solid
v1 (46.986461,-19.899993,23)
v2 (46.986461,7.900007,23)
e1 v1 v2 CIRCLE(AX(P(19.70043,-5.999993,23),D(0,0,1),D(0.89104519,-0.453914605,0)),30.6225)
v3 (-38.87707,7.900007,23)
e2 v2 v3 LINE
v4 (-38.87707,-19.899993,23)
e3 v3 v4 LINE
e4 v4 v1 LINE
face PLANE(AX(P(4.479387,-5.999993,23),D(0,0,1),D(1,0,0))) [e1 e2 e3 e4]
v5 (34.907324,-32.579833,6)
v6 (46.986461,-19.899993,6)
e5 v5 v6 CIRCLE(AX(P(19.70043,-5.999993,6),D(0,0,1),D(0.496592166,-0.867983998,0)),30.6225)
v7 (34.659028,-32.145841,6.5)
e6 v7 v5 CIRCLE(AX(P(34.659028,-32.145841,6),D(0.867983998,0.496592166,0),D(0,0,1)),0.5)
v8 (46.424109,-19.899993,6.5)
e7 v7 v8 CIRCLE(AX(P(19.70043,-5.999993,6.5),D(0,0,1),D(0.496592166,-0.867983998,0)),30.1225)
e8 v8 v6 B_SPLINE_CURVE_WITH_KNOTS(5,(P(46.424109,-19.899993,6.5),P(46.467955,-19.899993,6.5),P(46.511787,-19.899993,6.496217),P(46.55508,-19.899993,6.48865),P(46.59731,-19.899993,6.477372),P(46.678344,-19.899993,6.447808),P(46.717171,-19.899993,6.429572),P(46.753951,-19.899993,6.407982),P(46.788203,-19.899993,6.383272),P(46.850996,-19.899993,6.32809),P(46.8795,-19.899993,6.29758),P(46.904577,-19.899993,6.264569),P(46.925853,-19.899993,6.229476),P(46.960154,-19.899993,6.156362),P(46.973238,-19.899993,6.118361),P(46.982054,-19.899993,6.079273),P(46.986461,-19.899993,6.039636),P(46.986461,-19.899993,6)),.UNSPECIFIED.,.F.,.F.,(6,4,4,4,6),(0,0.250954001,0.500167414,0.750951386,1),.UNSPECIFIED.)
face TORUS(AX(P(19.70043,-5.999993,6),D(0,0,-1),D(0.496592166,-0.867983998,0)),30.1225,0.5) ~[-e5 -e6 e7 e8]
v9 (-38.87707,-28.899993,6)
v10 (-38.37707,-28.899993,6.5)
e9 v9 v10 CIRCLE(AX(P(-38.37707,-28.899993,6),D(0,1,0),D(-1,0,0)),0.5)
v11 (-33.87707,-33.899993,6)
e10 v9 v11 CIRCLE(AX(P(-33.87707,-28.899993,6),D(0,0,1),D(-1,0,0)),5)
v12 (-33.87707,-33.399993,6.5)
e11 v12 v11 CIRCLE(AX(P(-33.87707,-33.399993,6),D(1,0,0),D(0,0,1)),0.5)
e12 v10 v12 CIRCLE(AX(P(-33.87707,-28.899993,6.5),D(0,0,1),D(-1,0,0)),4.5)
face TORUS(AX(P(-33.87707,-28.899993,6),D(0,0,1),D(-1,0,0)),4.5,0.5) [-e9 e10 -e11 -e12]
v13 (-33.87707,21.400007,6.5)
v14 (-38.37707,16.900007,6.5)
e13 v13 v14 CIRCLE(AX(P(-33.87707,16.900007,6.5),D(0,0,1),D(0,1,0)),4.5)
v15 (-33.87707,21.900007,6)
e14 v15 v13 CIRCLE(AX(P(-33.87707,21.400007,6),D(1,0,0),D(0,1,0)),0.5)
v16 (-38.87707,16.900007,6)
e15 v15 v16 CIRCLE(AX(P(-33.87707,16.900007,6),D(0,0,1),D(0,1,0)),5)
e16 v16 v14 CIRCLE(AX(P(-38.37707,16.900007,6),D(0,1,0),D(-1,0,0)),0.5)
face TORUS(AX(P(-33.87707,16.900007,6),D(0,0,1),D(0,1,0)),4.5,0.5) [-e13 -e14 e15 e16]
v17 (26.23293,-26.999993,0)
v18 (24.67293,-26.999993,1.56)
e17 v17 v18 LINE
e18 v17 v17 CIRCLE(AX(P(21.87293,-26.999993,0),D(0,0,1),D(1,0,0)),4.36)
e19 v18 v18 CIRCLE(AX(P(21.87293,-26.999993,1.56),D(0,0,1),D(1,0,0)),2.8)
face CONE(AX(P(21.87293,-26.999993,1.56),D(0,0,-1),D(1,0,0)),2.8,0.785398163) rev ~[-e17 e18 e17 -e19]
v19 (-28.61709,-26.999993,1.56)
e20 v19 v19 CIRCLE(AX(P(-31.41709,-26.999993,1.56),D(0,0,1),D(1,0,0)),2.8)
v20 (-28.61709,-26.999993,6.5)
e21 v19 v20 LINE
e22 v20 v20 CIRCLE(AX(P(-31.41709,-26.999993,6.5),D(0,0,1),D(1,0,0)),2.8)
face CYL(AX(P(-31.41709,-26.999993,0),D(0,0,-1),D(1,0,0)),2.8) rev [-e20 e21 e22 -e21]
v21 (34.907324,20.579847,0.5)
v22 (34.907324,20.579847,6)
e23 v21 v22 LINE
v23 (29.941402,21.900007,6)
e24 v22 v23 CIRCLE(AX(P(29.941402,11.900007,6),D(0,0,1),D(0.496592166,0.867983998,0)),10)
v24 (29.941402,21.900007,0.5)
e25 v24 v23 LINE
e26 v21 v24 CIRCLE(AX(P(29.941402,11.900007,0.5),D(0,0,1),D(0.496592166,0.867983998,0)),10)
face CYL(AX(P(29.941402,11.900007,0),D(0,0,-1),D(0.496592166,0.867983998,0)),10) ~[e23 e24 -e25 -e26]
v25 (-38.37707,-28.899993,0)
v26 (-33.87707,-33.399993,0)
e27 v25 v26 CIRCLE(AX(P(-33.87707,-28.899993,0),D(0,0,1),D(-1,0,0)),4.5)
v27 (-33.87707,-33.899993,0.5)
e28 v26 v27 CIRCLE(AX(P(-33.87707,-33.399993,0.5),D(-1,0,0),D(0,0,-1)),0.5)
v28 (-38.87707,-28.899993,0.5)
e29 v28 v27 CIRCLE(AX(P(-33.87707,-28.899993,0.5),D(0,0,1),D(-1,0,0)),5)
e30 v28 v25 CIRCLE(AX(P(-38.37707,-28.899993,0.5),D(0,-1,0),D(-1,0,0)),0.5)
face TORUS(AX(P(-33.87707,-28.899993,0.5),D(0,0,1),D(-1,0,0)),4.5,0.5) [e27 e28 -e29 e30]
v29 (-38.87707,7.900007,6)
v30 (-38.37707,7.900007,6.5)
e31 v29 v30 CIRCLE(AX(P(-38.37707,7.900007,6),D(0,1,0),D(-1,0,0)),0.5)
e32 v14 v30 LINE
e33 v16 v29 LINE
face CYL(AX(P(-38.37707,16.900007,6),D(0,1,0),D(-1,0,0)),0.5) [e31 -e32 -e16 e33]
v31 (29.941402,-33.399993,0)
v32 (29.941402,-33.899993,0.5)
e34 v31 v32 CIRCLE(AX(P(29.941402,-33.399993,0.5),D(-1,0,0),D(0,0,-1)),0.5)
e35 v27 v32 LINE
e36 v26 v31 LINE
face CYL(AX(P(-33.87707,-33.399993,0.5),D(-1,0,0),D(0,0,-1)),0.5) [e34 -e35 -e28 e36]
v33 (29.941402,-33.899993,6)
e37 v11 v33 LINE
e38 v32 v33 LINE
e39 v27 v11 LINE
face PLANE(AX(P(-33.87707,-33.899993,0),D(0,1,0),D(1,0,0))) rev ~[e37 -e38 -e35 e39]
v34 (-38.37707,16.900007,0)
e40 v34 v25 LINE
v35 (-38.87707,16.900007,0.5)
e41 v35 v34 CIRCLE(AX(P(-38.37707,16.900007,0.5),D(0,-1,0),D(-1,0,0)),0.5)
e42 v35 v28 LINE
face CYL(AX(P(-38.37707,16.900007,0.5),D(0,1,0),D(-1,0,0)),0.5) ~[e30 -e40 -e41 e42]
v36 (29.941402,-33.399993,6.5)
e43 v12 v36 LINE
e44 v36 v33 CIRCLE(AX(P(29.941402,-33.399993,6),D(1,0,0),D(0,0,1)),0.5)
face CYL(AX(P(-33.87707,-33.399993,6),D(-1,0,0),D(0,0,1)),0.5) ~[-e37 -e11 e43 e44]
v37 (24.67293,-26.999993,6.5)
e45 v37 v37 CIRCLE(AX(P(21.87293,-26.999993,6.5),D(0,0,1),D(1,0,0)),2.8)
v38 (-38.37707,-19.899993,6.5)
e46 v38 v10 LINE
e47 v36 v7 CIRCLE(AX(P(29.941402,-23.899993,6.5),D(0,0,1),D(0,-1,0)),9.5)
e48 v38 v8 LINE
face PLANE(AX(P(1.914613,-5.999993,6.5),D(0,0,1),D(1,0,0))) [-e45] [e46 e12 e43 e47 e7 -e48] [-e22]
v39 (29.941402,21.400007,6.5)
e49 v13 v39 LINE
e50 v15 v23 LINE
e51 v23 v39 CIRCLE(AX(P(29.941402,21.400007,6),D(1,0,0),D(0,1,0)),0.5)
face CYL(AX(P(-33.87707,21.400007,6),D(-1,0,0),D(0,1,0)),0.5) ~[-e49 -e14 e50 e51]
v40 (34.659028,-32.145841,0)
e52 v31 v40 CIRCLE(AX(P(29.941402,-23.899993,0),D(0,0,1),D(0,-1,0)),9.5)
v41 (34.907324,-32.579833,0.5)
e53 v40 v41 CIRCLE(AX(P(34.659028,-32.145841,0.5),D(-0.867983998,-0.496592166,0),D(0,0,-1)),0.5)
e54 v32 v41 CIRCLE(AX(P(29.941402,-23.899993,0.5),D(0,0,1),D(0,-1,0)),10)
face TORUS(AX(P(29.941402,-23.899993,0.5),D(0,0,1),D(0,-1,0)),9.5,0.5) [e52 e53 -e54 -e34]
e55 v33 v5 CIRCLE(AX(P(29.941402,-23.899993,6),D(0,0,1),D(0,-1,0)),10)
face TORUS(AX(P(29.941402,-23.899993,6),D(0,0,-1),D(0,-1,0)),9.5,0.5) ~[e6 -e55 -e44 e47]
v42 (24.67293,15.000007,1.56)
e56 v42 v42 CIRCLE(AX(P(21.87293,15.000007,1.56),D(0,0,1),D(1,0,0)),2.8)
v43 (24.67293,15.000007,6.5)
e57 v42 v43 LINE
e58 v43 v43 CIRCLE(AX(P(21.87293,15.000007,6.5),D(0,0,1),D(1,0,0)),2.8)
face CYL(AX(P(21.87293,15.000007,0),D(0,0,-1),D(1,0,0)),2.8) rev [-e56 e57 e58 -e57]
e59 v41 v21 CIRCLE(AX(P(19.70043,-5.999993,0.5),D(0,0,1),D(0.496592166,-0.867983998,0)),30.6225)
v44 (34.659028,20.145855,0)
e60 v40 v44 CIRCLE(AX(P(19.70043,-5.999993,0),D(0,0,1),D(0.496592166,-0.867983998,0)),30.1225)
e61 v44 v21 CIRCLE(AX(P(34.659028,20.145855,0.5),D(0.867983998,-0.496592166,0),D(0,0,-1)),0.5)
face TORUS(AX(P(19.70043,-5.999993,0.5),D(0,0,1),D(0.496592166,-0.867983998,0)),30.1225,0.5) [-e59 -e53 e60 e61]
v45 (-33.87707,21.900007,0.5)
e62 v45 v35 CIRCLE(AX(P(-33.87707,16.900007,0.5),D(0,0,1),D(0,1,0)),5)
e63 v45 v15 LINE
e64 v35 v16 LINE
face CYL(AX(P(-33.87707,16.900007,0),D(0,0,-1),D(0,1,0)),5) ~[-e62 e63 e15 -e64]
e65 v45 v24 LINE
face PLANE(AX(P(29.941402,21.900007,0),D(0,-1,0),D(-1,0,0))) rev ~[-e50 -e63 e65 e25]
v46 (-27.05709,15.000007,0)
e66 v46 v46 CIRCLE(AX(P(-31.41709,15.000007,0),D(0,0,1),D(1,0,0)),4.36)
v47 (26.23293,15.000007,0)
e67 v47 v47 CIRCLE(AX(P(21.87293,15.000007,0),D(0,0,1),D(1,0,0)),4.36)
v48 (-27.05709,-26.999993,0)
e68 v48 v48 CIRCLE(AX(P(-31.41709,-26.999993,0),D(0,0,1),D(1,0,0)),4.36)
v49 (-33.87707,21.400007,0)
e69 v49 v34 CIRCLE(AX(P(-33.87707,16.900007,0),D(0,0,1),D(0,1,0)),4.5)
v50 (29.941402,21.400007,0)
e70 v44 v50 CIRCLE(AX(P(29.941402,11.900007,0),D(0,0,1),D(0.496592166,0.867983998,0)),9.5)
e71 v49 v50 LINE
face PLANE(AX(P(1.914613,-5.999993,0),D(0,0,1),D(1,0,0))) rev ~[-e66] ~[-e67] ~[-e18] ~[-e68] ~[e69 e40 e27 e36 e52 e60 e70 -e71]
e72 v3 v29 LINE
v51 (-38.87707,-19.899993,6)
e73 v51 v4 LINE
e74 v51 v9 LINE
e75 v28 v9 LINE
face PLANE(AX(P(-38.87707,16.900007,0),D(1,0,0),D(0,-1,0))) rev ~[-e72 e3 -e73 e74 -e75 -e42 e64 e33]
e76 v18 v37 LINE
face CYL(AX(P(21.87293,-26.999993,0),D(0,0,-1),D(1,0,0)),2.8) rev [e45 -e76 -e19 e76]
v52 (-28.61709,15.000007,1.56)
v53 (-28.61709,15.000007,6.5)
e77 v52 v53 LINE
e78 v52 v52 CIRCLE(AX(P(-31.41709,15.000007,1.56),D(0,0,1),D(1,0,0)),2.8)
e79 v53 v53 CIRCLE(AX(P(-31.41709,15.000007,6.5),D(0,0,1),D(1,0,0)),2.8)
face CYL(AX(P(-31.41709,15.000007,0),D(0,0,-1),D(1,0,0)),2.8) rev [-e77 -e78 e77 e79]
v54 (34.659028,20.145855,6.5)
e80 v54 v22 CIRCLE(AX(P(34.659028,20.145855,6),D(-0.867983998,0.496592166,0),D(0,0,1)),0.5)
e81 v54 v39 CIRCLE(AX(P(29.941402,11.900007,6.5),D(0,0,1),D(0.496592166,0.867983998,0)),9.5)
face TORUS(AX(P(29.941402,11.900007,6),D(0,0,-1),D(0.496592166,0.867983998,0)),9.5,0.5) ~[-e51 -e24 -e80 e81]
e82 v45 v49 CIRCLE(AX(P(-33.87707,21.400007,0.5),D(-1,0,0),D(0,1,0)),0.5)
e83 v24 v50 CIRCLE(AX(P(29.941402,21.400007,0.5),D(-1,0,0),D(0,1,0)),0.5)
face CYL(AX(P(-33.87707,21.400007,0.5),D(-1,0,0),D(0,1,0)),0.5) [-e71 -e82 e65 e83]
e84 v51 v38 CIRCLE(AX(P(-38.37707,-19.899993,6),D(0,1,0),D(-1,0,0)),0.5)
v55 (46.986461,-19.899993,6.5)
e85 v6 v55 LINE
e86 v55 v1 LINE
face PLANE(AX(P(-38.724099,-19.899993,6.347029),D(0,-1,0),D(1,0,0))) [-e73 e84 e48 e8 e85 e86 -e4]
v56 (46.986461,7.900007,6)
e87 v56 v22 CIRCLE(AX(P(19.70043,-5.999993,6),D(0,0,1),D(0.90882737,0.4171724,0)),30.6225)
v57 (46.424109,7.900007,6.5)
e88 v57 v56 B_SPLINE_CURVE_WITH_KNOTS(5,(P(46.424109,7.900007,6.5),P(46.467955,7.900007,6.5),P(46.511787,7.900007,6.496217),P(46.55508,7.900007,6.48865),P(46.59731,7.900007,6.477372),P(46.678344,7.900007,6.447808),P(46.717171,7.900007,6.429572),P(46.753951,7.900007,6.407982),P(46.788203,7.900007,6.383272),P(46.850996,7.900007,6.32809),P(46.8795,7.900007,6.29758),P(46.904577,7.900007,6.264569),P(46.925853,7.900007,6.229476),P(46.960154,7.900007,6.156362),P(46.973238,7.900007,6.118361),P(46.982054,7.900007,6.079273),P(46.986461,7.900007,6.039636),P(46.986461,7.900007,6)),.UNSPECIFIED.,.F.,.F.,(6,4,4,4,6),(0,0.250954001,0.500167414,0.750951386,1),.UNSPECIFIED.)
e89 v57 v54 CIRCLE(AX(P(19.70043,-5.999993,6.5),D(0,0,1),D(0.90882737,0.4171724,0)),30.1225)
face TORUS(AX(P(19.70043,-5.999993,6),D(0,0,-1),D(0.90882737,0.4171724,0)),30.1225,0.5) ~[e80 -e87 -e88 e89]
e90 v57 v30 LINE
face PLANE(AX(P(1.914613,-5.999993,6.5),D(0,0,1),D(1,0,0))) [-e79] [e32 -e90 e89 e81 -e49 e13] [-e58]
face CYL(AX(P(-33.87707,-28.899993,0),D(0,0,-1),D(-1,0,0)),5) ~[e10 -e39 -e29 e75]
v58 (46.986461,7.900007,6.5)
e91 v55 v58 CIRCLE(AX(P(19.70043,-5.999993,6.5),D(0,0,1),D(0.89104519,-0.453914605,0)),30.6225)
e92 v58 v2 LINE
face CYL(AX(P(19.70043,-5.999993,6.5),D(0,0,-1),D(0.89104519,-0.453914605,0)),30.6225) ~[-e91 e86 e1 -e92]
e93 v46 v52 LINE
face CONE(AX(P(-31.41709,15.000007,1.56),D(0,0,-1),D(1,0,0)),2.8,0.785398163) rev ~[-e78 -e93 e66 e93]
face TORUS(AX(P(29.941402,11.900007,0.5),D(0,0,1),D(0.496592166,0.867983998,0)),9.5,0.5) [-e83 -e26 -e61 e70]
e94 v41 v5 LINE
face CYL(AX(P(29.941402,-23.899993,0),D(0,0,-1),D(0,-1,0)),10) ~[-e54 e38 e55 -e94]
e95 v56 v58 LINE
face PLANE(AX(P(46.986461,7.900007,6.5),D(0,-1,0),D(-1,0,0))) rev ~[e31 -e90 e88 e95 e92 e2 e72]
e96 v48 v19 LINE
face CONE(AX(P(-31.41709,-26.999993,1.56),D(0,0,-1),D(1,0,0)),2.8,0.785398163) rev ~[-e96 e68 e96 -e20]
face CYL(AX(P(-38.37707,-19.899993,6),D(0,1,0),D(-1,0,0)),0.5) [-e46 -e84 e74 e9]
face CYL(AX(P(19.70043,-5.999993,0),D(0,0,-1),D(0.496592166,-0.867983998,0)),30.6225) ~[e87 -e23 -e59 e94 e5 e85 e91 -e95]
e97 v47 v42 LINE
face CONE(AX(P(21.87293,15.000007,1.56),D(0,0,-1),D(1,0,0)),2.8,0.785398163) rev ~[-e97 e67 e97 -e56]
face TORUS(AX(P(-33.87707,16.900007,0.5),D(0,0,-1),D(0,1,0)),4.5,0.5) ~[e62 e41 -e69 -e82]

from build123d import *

# Parameters (mm, degrees)
F0_R         = 2.8
F1_DEPTH     = 6.5
F3_DEPTH     = 16.5
F4_T1_DEPTH  = 63.8184719387
F4_T3_DEPTH  = 45.8
F4_T5_DEPTH  = 9
F4_T7_DEPTH  = 9
F4_T10_ANGLE = 90
F4_T12_ANGLE = 120.4504110916
F4_T14_ANGLE = 90
F4_T16_ANGLE = 90
F4_T18_ANGLE = 29.7747944542
F4_T20_ANGLE = 29.7747944542
F4_T22_ANGLE = 29.7747944542
F4_T26_ANGLE = 35.5690080159
F4_T29_ANGLE = 90
F4_T33_ANGLE = 35.5690080159
F4_T36_ANGLE = 29.7747944542
F5_SIZE      = 1.56


# Not quite as in the source:
# - a fillet or chamfer that OpenCascade refuses, or shapes differently, is made with other operations: its cross-section is extruded or revolved along the edge and cut away or added


with BuildPart() as f1:
    # F0 (on Top) → F1 (new body)
    with BuildSketch(Plane.XY):
        with BuildLine():
            Line((-38.8770699501, 16.9000072956), (-38.8770699501, -28.8999927044))
            ThreePointArc((-38.8770699501, -28.8999927044), (-37.412603856, -32.4355266103), (-33.8770699501, -33.8999927044))
            Line((-33.8770699501, -33.8999927044), (29.9414019886, -33.8999927044))
            ThreePointArc((29.9414019886, -33.8999927044), (32.5106042183, -33.5643188528), (34.9073236464, -32.579832685))
            ThreePointArc((34.9073236464, -32.579832685), (50.3229300499, -5.9999927044), (34.9073236464, 20.5798472762))
            ThreePointArc((34.9073236464, 20.5798472762), (32.5106042183, 21.564333444), (29.9414019886, 21.9000072956))
            Line((29.9414019886, 21.9000072956), (-33.8770699501, 21.9000072956))
            ThreePointArc((-33.8770699501, 21.9000072956), (-37.412603856, 20.4355412015), (-38.8770699501, 16.9000072956))
        make_face()
        with Locations((-31.4170904458, -26.9999932498)):
            Circle(F0_R, mode=Mode.SUBTRACT)
        with Locations((21.8729300499, -26.9999927044)):
            Circle(F0_R, mode=Mode.SUBTRACT)
        with Locations((-31.4170904458, 15.0000071153)):
            Circle(F0_R, mode=Mode.SUBTRACT)
        with Locations((21.8729300499, 15.0000072956)):
            Circle(F0_R, mode=Mode.SUBTRACT)
    extrude(amount=F1_DEPTH)

    # F2 (on face) → F3 (join)
    with BuildSketch(Plane.XY.offset(6.5)):
        with BuildLine():
            Line((-38.8770699501, 7.9000072956), (-38.8770699501, -5.9999927044))
            Line((-38.8770699501, -5.9999927044), (-38.8770699501, -19.8999927044))
            Line((-38.8770699501, -19.8999927044), (46.9864613892, -19.8999927044))
            ThreePointArc((46.9864613892, -19.8999927044), (50.3229300499, -5.9999927044), (46.9864613892, 7.9000072956))
            Line((46.9864613892, 7.9000072956), (-38.8770699501, 7.9000072956))
        make_face()
    extrude(amount=F3_DEPTH)

    # F4: fillet of radius 0.5 on 18 edges, made by hand

    # F4_s2 → F4_t1 (cut)
    with BuildSketch(Plane.YZ.offset(-33.8770699501)):
        with BuildLine():
            ThreePointArc((21.9000072956, 0.5), (21.7535606862, 0.1464466094), (21.4000072956, 0))
            Line((21.4000072956, 0), (21.9000072956, 0))
            Line((21.9000072956, 0), (21.9000072956, 0.5))
        make_face()
        with BuildLine():
            ThreePointArc((21.9000072956, 6), (21.7535606862, 6.3535533906), (21.4000072956, 6.5))
            Line((21.4000072956, 6.5), (21.9000072956, 6.5))
            Line((21.9000072956, 6.5), (21.9000072956, 6))
        make_face()
        with BuildLine():
            ThreePointArc((-33.3999927044, 6.5), (-33.753546095, 6.3535533906), (-33.8999927044, 6))
            Line((-33.8999927044, 6), (-33.8999927044, 6.5))
            Line((-33.8999927044, 6.5), (-33.3999927044, 6.5))
        make_face()
        with BuildLine():
            ThreePointArc((-33.3999927044, 0), (-33.753546095, 0.1464466094), (-33.8999927044, 0.5))
            Line((-33.8999927044, 0.5), (-33.8999927044, 0))
            Line((-33.8999927044, 0), (-33.3999927044, 0))
        make_face()
    extrude(amount=F4_T1_DEPTH, mode=Mode.SUBTRACT)

    # F4_s4 → F4_t3 (cut)
    with BuildSketch(Plane.XZ.offset(-16.9000072956)):
        with BuildLine():
            ThreePointArc((-38.8770699501, 0.5), (-38.7306233407, 0.1464466094), (-38.3770699501, 0))
            Line((-38.3770699501, 0), (-38.8770699501, 0))
            Line((-38.8770699501, 0), (-38.8770699501, 0.5))
        make_face()
    extrude(amount=F4_T3_DEPTH, mode=Mode.SUBTRACT)

    # F4_s6 → F4_t5 (cut)
    with BuildSketch(Plane.XZ.offset(-16.9000072956)):
        with BuildLine():
            ThreePointArc((-38.8770699501, 6), (-38.7306233407, 6.3535533906), (-38.3770699501, 6.5))
            Line((-38.3770699501, 6.5), (-38.8770699501, 6.5))
            Line((-38.8770699501, 6.5), (-38.8770699501, 6))
        make_face()
    extrude(amount=F4_T5_DEPTH, mode=Mode.SUBTRACT)

    # F4_s8 → F4_t7 (cut)
    with BuildSketch(Plane.XZ.offset(19.8999927044)):
        with BuildLine():
            ThreePointArc((-38.8770699501, 6), (-38.7306233407, 6.3535533906), (-38.3770699501, 6.5))
            Line((-38.3770699501, 6.5), (-38.8770699501, 6.5))
            Line((-38.8770699501, 6.5), (-38.8770699501, 6))
        make_face()
    extrude(amount=F4_T7_DEPTH, mode=Mode.SUBTRACT)

    # F4_s9 → F4_t10 (revolve, cut)
    with BuildSketch(Plane.YZ.offset(-33.8770699501)):
        with BuildLine():
            ThreePointArc((21.9000072956, 0.5), (21.7535606862, 0.1464466094), (21.4000072956, 0))
            Line((21.4000072956, 0), (21.9000072956, 0))
            Line((21.9000072956, 0), (21.9000072956, 0.5))
        make_face()
    revolve(axis=Axis((-33.8770699501, 16.9000072956, 0), (0, 0, 1)), revolution_arc=F4_T10_ANGLE, mode=Mode.SUBTRACT)

    # F4_s11 → F4_t12 (revolve, cut)
    with BuildSketch(Plane(origin=(12.2560283734, 7.0119353437, 0), x_dir=(0, 0, 1), z_dir=(-0.8679839981, -0.4965921658, 0))):
        with BuildLine():
            ThreePointArc((0, -45.1134768811), (0.1464466094, -45.4670302717), (0.5, -45.6134768811))
            Line((0.5, -45.6134768811), (0, -45.6134768811))
            Line((0, -45.6134768811), (0, -45.1134768811))
        make_face()
    revolve(axis=Axis((19.7004300499, -5.9999927044, 0), (0, 0, 1)), revolution_arc=F4_T12_ANGLE, mode=Mode.SUBTRACT)

    # F4_s13 → F4_t14 (revolve, cut)
    with BuildSketch(Plane.YZ.offset(-33.8770699501)):
        with BuildLine():
            ThreePointArc((21.9000072956, 6), (21.7535606862, 6.3535533906), (21.4000072956, 6.5))
            Line((21.4000072956, 6.5), (21.9000072956, 6.5))
            Line((21.9000072956, 6.5), (21.9000072956, 6))
        make_face()
    revolve(axis=Axis((-33.8770699501, 16.9000072956, 6.5), (0, 0, 1)), revolution_arc=F4_T14_ANGLE, mode=Mode.SUBTRACT)

    # F4_s15 → F4_t16 (revolve, cut)
    with BuildSketch(Plane.XZ.offset(28.8999927044)):
        with BuildLine():
            ThreePointArc((-38.3770699501, 0), (-38.7306233407, 0.1464466094), (-38.8770699501, 0.5))
            Line((-38.8770699501, 0.5), (-38.8770699501, 0))
            Line((-38.8770699501, 0), (-38.3770699501, 0))
        make_face()
    revolve(axis=Axis((-33.8770699501, -28.8999927044, 0), (0, 0, 1)), revolution_arc=F4_T16_ANGLE, mode=Mode.SUBTRACT)

    # F4_s17 → F4_t18 (revolve, cut)
    with BuildSketch(Plane.YZ.offset(29.9414019886)):
        with BuildLine():
            ThreePointArc((-33.3999927044, 0), (-33.753546095, 0.1464466094), (-33.8999927044, 0.5))
            Line((-33.8999927044, 0.5), (-33.8999927044, 0))
            Line((-33.8999927044, 0), (-33.3999927044, 0))
        make_face()
    revolve(axis=Axis((29.9414019886, -23.8999927044, 0), (0, 0, 1)), revolution_arc=F4_T18_ANGLE, mode=Mode.SUBTRACT)

    # F4_s19 → F4_t20 (revolve, cut)
    with BuildSketch(Plane(origin=(17.4284307256, -9.9711770948, 0), x_dir=(0, 0, 1), z_dir=(0.8679839981, -0.4965921658, 0))):
        with BuildLine():
            ThreePointArc((0, -34.6976815693), (0.1464466094, -35.0512349599), (0.5, -35.1976815693))
            Line((0.5, -35.1976815693), (0, -35.1976815693))
            Line((0, -35.1976815693), (0, -34.6976815693))
        make_face()
    revolve(axis=Axis((29.9414019886, 11.9000072956, 0), (0, 0, 1)), revolution_arc=F4_T20_ANGLE, mode=Mode.SUBTRACT)

    # F4_s21 → F4_t22 (revolve, cut)
    with BuildSketch(Plane(origin=(17.4284307256, -9.9711770948, 0), x_dir=(0, 0, 1), z_dir=(0.8679839981, -0.4965921658, 0))):
        with BuildLine():
            ThreePointArc((6.5, -34.6976815693), (6.3535533906, -35.0512349599), (6, -35.1976815693))
            Line((6, -35.1976815693), (6.5, -35.1976815693))
            Line((6.5, -35.1976815693), (6.5, -34.6976815693))
        make_face()
    revolve(axis=Axis((29.9414019886, 11.9000072956, 6.5), (0, 0, 1)), revolution_arc=F4_T22_ANGLE, mode=Mode.SUBTRACT)


with BuildPart() as f4_tool24:
    # F4_s25 → F4_t26 (revolve)
    with BuildSketch(Plane(origin=(5.7033446243, -12.4249727464, 0), x_dir=(0, 0, 1), z_dir=(0.4171723997, -0.9088273703, 0))):
        with BuildLine():
            ThreePointArc((6.5, -45.5237586807), (6.3535533906, -45.8773120713), (6, -46.0237586807))
            Line((6, -46.0237586807), (6.5, -46.0237586807))
            Line((6.5, -46.0237586807), (6.5, -45.5237586807))
        make_face()
    revolve(axis=Axis((19.7004300499, -5.9999927044, 6.5), (0, 0, 1)), revolution_arc=F4_T26_ANGLE)

    split(bisect_by=Plane.XZ.offset(-7.9000072956), keep=Keep.BOTTOM)


with BuildPart() as f1_1:
    add(f1.part)

    # F4_t23: cut F4_tool24
    add(f4_tool24.part, mode=Mode.SUBTRACT)

    # F4_s28 → F4_t29 (revolve, cut)
    with BuildSketch(Plane.XZ.offset(28.8999927044)):
        with BuildLine():
            ThreePointArc((-38.8770699501, 6), (-38.7306233407, 6.3535533906), (-38.3770699501, 6.5))
            Line((-38.3770699501, 6.5), (-38.8770699501, 6.5))
            Line((-38.8770699501, 6.5), (-38.8770699501, 6))
        make_face()
    revolve(axis=Axis((-33.8770699501, -28.8999927044, 6.5), (0, 0, 1)), revolution_arc=F4_T29_ANGLE, mode=Mode.SUBTRACT)


with BuildPart() as f4_tool31:
    # F4_s32 → F4_t33 (revolve)
    with BuildSketch(Plane(origin=(12.2560283734, 7.0119353437, 0), x_dir=(0, 0, 1), z_dir=(-0.8679839981, -0.4965921658, 0))):
        with BuildLine():
            ThreePointArc((6.5, -45.1134768811), (6.3535533906, -45.4670302717), (6, -45.6134768811))
            Line((6, -45.6134768811), (6.5, -45.6134768811))
            Line((6.5, -45.6134768811), (6.5, -45.1134768811))
        make_face()
    revolve(axis=Axis((19.7004300499, -5.9999927044, 6.5), (0, 0, 1)), revolution_arc=F4_T33_ANGLE)

    split(bisect_by=Plane.XZ.offset(19.8999927044), keep=Keep.TOP)


with BuildPart() as f1_2:
    add(f1_1.part)

    # F4_t30: cut F4_tool31
    add(f4_tool31.part, mode=Mode.SUBTRACT)

    # F4_s35 → F4_t36 (revolve, cut)
    with BuildSketch(Plane.YZ.offset(29.9414019886)):
        with BuildLine():
            ThreePointArc((-33.3999927044, 6.5), (-33.753546095, 6.3535533906), (-33.8999927044, 6))
            Line((-33.8999927044, 6), (-33.8999927044, 6.5))
            Line((-33.8999927044, 6.5), (-33.3999927044, 6.5))
        make_face()
    revolve(axis=Axis((29.9414019886, -23.8999927044, 6.5), (0, 0, 1)), revolution_arc=F4_T36_ANGLE, mode=Mode.SUBTRACT)

    # F5
    f5_edges = [f1_2.edges().sort_by_distance(p)[0] for p in [
        (-34.21709, 15.000007, 0),
        (-34.21709, -26.999993, 0),
        (19.07293, -26.999993, 0),
        (19.07293, 15.000007, 0),
    ]]
    chamfer(f5_edges, length=F5_SIZE)


solid = f1_2.part
